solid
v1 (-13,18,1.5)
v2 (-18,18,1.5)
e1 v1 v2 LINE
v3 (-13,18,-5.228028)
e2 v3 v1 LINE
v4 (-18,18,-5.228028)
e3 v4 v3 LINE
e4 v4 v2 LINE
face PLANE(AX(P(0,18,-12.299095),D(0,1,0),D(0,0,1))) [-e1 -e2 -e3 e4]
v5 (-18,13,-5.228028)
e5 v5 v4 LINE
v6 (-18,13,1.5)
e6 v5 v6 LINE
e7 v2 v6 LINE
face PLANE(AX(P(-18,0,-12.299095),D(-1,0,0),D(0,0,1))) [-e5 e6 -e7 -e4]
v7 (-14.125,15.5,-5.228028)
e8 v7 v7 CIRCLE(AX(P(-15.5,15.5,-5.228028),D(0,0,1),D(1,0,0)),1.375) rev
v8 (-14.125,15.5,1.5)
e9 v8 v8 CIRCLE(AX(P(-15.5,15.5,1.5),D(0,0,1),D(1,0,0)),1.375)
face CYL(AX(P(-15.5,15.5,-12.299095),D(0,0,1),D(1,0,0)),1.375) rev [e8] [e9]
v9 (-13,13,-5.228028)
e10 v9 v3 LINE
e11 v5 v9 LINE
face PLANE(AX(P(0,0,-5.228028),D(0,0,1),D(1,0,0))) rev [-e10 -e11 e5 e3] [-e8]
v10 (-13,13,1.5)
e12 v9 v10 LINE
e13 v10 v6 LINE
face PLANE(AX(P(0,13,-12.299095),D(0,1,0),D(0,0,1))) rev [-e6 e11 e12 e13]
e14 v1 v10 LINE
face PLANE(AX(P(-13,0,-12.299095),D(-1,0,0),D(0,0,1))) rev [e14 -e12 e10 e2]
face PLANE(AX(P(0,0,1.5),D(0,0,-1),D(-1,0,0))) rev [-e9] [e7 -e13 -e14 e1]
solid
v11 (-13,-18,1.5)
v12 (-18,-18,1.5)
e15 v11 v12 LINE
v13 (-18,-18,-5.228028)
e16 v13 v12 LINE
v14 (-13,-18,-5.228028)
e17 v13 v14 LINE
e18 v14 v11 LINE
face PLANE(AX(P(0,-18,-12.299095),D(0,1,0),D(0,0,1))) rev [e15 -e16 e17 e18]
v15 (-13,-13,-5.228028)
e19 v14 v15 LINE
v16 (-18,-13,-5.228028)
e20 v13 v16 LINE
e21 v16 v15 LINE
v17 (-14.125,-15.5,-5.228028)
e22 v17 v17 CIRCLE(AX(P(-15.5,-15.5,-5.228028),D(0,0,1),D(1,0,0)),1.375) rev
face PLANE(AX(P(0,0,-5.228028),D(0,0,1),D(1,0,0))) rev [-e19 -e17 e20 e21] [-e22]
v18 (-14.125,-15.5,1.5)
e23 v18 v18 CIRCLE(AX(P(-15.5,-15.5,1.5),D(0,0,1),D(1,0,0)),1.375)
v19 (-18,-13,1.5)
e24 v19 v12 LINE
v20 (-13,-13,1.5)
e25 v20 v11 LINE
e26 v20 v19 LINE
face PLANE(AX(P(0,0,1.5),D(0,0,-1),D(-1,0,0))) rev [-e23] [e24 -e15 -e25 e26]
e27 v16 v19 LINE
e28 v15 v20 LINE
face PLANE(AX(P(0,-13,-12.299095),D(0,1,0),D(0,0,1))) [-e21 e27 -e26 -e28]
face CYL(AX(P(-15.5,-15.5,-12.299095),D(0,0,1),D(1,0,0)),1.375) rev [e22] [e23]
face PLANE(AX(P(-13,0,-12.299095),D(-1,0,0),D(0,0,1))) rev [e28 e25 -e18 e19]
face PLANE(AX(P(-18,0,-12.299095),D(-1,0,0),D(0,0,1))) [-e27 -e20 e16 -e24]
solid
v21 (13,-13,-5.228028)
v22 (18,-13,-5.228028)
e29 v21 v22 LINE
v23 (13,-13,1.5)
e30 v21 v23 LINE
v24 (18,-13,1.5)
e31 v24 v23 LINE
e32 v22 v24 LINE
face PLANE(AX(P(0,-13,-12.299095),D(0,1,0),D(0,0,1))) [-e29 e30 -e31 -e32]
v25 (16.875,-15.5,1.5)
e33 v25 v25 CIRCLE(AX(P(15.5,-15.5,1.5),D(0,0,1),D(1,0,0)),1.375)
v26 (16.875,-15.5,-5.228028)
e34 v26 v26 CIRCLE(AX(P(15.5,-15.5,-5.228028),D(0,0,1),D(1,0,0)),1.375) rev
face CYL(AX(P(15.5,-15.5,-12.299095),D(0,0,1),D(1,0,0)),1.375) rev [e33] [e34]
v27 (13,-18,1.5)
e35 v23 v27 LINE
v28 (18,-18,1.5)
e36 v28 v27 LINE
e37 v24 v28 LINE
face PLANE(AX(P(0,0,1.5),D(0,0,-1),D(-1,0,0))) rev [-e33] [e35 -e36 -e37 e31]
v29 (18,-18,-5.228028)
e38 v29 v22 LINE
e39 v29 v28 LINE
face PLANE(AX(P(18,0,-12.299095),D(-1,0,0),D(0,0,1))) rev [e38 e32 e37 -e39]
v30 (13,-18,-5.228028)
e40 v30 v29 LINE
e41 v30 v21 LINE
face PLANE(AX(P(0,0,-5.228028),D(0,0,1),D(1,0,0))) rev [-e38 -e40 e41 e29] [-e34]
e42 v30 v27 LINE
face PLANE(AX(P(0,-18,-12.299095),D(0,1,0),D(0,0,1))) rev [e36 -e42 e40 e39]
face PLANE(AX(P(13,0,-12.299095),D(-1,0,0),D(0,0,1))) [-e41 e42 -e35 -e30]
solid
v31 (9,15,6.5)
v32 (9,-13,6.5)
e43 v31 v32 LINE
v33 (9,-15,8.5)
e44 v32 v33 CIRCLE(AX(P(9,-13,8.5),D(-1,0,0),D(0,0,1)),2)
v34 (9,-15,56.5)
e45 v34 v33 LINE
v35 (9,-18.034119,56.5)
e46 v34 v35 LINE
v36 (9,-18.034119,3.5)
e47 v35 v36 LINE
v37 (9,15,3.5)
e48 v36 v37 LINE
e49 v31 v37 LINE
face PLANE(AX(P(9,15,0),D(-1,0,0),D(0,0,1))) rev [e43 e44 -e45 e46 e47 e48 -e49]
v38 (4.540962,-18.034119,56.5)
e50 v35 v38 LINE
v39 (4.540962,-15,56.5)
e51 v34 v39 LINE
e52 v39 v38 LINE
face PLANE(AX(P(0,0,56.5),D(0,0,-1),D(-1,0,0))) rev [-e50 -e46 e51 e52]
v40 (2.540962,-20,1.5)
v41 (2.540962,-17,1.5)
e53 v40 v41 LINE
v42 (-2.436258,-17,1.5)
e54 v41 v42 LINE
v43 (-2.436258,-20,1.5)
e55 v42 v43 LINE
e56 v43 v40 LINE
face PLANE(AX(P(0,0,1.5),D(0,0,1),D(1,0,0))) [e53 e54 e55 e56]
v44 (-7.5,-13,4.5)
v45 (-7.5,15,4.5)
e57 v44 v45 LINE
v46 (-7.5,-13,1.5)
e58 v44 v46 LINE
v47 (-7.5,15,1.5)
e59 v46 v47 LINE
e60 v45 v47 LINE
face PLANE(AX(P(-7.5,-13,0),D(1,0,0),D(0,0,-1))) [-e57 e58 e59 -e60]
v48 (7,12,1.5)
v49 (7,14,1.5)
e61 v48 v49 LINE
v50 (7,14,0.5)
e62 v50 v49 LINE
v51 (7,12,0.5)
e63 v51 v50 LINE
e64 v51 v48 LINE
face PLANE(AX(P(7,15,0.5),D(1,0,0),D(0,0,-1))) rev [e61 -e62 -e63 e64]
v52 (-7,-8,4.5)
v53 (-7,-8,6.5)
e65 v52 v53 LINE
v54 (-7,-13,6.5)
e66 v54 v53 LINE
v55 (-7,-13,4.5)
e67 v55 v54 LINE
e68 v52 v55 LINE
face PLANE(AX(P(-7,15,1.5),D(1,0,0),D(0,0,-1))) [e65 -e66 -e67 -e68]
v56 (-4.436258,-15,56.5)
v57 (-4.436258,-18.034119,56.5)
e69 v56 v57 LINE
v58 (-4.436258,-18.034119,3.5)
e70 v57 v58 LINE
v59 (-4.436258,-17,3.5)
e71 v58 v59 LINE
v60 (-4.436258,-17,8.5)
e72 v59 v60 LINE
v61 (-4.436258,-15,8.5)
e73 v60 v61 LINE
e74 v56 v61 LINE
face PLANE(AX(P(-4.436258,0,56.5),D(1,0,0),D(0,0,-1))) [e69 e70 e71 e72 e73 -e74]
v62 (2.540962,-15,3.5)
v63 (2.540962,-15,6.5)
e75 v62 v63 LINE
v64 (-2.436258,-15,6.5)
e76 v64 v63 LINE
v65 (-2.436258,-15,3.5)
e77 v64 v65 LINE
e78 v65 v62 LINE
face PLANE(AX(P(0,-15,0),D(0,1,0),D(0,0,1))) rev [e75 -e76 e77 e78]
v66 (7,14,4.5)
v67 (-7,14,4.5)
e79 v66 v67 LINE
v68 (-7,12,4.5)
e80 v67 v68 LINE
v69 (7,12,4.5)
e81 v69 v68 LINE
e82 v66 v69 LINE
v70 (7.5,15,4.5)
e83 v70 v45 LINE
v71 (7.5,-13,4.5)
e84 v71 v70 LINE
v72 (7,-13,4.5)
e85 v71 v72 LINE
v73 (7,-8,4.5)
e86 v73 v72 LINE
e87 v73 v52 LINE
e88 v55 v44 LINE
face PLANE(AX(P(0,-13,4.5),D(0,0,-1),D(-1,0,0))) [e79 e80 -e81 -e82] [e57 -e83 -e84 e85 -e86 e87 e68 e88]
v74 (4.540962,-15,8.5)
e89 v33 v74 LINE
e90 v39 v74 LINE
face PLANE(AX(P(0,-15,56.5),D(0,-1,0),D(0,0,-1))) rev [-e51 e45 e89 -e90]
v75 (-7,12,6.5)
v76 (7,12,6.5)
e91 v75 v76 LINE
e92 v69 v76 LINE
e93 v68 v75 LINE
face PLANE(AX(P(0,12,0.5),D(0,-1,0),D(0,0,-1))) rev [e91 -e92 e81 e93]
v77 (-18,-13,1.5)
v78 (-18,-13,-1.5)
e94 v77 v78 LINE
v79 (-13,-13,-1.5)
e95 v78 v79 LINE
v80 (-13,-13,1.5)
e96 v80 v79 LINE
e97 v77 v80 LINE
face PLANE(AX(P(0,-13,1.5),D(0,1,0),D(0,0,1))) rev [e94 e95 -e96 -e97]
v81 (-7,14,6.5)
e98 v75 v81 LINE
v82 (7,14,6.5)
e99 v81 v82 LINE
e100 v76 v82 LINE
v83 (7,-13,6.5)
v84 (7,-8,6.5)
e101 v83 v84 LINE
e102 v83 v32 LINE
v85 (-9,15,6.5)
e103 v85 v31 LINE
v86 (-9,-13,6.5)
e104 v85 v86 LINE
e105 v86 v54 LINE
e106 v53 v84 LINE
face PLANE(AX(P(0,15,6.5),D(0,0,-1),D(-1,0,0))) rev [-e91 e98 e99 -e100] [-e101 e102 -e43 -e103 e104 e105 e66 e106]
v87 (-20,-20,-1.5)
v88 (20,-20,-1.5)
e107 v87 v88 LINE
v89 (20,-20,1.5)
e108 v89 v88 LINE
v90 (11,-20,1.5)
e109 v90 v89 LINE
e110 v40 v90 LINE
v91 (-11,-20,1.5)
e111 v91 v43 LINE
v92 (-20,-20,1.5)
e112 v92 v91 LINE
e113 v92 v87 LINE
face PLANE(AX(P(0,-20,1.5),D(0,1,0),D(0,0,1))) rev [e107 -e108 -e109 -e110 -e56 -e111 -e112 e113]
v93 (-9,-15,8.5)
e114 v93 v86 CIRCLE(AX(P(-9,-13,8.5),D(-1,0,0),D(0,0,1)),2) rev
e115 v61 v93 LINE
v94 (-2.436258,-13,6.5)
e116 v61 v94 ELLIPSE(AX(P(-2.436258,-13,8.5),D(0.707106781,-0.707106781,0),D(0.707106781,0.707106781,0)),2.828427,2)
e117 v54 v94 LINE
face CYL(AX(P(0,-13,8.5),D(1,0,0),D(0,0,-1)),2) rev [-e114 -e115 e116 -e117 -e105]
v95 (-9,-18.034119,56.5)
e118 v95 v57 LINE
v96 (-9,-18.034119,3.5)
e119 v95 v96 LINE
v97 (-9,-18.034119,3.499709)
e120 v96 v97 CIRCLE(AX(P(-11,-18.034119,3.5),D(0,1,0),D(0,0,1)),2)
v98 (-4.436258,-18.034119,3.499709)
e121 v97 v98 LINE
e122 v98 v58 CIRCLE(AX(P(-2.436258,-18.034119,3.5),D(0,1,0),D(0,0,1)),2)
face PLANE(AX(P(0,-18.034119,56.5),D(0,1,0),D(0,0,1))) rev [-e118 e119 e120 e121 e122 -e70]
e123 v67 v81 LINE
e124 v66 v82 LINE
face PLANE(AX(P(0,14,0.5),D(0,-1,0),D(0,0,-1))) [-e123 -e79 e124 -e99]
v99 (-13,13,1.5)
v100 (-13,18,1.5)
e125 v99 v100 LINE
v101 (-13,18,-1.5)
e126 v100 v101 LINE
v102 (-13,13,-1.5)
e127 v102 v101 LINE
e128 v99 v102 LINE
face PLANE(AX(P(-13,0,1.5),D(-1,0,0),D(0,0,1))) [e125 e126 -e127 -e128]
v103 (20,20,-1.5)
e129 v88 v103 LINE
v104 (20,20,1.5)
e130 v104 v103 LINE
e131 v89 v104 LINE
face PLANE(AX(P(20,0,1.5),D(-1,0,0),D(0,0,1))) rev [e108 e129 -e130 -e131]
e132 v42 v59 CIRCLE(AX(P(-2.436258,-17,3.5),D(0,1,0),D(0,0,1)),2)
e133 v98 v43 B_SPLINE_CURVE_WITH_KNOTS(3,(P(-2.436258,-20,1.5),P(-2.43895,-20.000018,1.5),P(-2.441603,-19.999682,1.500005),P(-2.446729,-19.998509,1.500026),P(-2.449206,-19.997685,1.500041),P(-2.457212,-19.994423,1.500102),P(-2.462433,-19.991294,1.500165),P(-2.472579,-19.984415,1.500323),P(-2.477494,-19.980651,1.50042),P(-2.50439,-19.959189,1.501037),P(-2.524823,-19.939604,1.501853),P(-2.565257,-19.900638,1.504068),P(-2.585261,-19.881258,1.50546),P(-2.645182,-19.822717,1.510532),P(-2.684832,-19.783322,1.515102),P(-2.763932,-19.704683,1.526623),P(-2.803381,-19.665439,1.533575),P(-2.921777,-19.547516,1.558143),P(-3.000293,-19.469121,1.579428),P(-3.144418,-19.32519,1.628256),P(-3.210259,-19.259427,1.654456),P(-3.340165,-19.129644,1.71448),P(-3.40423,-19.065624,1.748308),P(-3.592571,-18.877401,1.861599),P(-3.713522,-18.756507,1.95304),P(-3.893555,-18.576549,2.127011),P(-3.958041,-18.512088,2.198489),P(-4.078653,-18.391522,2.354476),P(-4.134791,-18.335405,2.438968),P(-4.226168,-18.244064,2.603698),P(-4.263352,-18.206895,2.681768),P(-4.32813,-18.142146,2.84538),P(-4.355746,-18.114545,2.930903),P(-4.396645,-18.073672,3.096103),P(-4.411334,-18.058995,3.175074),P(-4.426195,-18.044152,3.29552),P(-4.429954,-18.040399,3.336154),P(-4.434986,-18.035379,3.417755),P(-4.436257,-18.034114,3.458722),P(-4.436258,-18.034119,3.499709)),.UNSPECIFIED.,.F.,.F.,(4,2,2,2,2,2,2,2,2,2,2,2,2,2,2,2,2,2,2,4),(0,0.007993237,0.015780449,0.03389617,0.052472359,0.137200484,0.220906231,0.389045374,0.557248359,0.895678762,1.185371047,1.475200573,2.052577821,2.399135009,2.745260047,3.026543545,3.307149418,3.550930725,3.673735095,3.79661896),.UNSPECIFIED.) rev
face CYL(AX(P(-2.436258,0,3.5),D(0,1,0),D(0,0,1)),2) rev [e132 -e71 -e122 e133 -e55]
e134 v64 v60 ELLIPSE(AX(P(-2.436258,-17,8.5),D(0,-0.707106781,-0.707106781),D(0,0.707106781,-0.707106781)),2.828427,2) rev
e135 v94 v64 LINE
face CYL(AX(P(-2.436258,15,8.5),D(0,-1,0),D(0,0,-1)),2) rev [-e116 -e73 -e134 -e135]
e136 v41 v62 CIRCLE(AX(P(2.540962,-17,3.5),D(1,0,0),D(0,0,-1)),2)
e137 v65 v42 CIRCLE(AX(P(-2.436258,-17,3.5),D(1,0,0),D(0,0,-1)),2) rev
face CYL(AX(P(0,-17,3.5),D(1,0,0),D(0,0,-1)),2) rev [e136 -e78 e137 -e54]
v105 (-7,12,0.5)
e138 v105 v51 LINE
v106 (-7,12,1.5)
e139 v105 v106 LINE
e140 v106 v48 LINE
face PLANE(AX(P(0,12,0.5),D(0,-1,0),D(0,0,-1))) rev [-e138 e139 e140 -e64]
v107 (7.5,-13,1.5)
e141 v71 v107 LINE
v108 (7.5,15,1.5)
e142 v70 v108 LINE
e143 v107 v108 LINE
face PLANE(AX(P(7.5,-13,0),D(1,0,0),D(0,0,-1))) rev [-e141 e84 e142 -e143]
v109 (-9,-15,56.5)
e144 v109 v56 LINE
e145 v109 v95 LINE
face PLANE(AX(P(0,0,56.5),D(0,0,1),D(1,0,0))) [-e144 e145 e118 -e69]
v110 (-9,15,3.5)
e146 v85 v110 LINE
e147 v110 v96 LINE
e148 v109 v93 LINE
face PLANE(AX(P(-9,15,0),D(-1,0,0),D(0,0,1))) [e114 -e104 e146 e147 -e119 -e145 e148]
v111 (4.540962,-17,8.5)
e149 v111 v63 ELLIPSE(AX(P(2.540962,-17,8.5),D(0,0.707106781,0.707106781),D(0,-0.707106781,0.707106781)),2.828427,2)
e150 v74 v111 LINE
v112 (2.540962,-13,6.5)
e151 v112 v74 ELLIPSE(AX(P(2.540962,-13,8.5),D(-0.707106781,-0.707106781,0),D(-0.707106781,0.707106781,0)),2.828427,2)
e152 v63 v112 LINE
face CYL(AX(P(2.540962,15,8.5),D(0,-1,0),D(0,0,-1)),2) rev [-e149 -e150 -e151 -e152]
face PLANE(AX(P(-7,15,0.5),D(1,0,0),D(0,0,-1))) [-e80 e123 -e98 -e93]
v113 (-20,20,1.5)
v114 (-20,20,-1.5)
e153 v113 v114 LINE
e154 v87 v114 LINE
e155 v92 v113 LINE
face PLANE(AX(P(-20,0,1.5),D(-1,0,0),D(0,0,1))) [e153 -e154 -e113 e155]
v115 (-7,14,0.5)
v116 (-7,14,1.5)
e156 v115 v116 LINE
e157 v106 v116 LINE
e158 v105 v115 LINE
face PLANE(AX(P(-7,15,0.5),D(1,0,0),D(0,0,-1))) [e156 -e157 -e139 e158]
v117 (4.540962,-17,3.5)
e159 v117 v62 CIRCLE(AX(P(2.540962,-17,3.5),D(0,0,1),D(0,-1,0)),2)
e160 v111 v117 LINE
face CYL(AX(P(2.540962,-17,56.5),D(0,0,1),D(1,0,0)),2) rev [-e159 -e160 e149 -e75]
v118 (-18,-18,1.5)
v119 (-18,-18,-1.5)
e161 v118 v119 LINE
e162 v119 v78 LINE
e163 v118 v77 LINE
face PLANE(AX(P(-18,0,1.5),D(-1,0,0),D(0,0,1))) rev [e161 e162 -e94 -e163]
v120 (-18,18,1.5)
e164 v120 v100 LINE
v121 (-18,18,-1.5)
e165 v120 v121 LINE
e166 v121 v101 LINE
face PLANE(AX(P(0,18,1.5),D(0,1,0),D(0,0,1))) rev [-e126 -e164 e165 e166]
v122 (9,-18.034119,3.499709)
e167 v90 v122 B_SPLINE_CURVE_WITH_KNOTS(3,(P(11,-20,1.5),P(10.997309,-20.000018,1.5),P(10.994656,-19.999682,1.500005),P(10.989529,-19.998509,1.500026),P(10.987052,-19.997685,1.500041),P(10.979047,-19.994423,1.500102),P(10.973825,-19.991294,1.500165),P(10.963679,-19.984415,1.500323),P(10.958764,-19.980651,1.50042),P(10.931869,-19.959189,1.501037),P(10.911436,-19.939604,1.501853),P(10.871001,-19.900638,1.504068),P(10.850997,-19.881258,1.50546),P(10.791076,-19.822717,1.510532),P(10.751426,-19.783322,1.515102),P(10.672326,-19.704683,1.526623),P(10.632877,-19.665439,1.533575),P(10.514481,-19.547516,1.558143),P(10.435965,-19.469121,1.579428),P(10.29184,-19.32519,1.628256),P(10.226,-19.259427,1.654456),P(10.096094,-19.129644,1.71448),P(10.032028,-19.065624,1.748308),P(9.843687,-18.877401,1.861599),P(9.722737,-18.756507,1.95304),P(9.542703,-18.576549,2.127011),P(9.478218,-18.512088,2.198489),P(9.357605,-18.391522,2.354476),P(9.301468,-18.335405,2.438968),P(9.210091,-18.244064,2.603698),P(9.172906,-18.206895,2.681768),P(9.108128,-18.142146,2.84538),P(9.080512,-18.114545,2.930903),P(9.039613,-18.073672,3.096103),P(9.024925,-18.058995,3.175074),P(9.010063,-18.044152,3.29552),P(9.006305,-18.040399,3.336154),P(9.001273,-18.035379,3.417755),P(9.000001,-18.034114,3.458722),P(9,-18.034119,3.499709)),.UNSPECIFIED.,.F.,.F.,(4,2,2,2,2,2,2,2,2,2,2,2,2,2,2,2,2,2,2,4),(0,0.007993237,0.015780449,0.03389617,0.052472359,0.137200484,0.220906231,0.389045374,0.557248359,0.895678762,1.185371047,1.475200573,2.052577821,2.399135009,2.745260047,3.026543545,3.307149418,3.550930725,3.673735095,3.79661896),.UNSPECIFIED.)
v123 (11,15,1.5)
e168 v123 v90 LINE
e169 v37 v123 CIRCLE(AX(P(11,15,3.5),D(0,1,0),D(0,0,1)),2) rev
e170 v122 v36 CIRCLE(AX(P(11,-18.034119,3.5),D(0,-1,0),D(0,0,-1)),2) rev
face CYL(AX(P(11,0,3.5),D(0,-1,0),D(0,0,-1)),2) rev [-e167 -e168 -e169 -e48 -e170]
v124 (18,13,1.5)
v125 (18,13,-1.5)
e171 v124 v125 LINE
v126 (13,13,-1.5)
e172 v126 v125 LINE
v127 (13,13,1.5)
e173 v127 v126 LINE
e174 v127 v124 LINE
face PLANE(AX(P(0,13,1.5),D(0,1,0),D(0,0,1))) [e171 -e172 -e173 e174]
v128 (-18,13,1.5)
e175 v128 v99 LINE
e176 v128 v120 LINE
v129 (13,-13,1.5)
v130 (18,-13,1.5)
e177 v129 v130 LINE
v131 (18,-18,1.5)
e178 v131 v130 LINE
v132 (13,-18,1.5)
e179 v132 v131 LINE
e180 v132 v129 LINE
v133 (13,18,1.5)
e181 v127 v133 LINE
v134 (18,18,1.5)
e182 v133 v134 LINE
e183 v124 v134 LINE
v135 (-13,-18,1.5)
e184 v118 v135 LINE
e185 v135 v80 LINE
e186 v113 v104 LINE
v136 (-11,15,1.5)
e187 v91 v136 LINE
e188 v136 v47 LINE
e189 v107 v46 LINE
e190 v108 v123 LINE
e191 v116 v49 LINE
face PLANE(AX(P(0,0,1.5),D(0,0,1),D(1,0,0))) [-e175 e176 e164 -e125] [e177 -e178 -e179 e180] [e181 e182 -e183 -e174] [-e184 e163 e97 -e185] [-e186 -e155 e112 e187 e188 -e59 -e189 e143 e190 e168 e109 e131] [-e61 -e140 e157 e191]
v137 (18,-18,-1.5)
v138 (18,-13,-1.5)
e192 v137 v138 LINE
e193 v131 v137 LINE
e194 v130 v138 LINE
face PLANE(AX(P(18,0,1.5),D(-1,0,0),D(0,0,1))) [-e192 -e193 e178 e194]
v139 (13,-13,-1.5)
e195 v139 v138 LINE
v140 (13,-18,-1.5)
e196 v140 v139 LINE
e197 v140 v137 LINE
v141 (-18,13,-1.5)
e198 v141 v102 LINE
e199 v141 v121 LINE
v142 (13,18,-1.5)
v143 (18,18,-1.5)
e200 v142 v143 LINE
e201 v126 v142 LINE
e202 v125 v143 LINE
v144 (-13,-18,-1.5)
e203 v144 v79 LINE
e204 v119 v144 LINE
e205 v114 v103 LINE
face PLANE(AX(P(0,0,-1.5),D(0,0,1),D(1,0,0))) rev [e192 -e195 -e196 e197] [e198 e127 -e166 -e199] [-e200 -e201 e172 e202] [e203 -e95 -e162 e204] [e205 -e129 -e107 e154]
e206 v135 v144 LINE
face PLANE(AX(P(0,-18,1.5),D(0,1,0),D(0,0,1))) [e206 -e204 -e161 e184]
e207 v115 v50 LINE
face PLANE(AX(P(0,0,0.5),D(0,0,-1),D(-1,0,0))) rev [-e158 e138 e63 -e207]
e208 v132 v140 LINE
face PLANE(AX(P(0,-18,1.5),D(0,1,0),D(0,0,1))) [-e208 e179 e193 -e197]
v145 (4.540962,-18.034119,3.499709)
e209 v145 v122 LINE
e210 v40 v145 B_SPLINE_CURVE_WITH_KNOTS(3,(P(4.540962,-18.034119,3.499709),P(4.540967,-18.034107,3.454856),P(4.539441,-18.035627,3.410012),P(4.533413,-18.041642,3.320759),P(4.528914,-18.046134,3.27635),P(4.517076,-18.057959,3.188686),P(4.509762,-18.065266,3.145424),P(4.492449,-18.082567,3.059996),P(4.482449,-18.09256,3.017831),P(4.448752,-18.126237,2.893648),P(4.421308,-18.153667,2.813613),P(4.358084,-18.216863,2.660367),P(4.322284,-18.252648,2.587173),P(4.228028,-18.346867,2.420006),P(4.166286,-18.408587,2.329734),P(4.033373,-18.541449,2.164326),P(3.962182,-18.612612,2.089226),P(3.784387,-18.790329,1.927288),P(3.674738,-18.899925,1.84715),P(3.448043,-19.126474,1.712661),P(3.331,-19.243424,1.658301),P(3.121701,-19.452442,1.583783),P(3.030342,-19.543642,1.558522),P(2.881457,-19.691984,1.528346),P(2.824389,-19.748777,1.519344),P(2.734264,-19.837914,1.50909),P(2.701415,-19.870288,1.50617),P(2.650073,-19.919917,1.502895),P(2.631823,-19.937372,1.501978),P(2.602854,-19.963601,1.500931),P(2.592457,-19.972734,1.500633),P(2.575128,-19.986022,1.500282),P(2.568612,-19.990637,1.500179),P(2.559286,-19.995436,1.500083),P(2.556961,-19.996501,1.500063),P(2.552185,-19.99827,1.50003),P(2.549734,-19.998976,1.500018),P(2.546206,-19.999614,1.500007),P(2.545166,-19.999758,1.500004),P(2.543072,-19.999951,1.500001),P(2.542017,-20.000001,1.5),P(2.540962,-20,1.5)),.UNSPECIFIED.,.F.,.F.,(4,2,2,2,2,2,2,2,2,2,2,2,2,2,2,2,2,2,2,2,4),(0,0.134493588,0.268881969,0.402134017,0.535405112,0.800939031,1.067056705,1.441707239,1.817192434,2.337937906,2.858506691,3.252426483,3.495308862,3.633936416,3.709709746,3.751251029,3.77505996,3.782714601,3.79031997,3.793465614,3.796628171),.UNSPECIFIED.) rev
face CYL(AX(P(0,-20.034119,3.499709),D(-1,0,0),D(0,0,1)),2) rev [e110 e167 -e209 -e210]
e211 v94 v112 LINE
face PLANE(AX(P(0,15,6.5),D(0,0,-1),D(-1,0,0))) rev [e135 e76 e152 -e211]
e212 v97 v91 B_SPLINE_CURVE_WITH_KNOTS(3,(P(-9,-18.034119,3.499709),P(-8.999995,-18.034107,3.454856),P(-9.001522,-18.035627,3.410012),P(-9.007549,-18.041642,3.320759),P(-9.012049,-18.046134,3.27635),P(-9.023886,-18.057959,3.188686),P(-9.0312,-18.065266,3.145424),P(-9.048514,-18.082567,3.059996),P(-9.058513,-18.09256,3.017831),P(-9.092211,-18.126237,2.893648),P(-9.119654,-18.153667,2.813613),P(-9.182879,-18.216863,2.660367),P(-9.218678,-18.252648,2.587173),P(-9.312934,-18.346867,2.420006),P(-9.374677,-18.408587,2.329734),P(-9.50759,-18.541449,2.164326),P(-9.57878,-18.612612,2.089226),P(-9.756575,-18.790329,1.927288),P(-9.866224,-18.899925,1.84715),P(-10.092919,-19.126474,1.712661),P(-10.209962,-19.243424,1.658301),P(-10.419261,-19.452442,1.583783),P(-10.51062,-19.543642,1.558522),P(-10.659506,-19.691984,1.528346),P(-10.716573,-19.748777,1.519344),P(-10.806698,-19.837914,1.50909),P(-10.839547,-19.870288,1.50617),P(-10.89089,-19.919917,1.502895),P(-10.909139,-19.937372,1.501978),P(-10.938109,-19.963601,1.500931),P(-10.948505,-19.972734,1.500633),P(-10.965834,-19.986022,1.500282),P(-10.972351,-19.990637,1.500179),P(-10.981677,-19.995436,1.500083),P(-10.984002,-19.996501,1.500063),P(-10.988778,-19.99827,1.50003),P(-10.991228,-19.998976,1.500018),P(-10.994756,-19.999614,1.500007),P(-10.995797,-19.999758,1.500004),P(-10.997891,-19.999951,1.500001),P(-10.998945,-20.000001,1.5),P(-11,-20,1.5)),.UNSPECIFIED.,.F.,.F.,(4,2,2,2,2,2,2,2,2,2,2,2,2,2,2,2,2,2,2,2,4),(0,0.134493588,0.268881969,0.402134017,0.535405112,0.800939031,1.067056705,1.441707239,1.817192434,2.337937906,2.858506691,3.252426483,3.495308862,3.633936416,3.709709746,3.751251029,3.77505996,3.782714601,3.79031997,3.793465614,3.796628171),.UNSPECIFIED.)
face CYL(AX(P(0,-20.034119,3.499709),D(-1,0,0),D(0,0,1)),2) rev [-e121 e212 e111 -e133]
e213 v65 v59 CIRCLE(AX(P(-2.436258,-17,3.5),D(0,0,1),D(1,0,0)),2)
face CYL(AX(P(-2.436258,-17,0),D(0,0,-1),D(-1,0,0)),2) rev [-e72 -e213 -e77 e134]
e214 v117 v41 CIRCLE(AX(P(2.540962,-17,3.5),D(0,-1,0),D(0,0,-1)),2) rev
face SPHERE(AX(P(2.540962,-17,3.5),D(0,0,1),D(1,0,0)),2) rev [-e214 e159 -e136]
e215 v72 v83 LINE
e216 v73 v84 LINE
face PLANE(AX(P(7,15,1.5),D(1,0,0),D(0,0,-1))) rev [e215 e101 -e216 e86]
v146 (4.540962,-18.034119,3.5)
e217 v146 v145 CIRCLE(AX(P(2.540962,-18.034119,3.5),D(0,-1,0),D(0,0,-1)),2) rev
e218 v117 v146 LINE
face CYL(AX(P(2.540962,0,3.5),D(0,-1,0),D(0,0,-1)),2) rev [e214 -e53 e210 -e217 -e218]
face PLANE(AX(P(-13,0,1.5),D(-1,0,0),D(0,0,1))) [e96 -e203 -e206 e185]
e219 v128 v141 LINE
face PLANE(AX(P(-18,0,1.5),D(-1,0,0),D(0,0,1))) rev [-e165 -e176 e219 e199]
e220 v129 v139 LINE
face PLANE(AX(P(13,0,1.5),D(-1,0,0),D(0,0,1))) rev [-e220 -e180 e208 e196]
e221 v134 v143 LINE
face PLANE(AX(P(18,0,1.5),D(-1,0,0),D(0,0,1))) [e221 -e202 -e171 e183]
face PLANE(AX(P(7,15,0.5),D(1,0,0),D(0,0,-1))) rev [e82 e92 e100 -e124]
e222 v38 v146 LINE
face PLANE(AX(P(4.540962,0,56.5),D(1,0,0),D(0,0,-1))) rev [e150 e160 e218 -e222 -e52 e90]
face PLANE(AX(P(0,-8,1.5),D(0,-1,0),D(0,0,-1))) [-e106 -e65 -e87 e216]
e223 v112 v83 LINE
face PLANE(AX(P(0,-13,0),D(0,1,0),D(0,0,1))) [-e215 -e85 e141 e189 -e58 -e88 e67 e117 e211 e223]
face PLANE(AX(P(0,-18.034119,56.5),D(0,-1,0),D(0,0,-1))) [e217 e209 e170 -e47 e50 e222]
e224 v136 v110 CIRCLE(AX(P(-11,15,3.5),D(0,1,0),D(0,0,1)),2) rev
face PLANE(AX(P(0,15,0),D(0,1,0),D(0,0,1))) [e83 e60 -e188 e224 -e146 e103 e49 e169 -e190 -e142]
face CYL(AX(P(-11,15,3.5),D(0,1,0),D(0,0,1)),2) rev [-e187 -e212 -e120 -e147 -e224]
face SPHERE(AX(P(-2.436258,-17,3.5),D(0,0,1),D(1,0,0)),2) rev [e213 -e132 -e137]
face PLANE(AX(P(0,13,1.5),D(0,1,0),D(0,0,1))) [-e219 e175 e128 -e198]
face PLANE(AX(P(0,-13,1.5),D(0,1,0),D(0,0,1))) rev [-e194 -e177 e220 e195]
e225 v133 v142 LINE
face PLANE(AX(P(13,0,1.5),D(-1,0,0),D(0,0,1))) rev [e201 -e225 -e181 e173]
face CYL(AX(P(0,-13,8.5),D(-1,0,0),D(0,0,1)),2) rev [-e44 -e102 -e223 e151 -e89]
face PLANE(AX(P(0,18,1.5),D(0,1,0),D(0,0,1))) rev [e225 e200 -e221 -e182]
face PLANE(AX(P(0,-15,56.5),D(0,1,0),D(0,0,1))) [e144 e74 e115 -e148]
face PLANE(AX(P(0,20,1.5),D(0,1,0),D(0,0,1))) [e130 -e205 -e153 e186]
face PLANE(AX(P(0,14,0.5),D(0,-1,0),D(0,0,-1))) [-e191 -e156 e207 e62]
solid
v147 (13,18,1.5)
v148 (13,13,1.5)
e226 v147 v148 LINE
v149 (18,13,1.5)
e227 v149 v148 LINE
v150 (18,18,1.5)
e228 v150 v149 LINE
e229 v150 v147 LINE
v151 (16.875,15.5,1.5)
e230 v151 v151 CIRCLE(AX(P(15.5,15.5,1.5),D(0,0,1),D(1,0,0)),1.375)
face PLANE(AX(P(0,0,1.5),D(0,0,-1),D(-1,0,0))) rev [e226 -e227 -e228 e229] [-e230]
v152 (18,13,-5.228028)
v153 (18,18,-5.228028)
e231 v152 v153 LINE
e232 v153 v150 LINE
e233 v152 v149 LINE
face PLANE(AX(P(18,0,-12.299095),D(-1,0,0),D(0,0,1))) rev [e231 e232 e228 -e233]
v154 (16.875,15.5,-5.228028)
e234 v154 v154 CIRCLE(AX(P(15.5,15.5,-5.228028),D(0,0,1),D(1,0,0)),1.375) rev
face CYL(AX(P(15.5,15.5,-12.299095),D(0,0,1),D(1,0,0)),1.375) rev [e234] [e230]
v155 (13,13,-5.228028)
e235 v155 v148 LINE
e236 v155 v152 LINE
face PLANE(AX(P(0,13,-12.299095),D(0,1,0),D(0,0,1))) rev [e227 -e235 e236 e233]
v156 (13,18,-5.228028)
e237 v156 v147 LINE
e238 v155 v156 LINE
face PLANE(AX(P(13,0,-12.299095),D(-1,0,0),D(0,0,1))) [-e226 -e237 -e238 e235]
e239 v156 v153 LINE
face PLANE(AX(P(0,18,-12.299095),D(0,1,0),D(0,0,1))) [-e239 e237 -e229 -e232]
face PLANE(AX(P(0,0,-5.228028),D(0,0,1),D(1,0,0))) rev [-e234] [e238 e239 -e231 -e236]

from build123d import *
from OCP.BRepAlgoAPI import BRepAlgoAPI_Cut
from OCP.TopTools import TopTools_ListOfShape

# Parameters (mm, degrees)
SKETCH1_W             = 40
SKETCH1_H             = 40
SKETCH1_W_2           = 5
SKETCH1_H_2           = 5
BOSS_EXTRUDE1_DEPTH   = 1.5
BOSS_EXTRUDE2_START   = 1.5
SKETCH1_3_W           = 5
SKETCH1_3_H           = 5
SKETCH1_3_R           = 1.375
BOSS_EXTRUDE2_DEPTH   = 6.728027623
BOSS_EXTRUDE2_2_DEPTH = 6.728027623
BOSS_EXTRUDE2_3_DEPTH = 6.728027623
BOSS_EXTRUDE2_4_DEPTH = 6.728027623
SKETCH2_W             = 18
SKETCH2_H             = 5
BOSS_EXTRUDE3_DEPTH   = 15
CUT_EXTRUDE1_START    = -13
SKETCH2_3_W           = 15
SKETCH2_3_H           = 3
CUT_EXTRUDE1_DEPTH    = 28
BOSS_EXTRUDE4_START   = 1.5
SKETCH5_W             = 4.563741623
SKETCH5_H             = 3.034118579
SKETCH5_W_2           = 4.459037602
BOSS_EXTRUDE4_DEPTH   = 55
CUT_EXTRUDE2_START    = 6.5
SKETCH5_3_W           = 14
SKETCH5_3_H           = 2
CUT_EXTRUDE2_DEPTH    = 6
CUT_EXTRUDE3_START    = 6.5
SKETCH5_4_W           = 14
SKETCH5_4_H           = 5
CUT_EXTRUDE3_DEPTH    = 5
FILLET2_START         = -9
FILLET2_DEPTH         = 18
FILLET2_START_2       = -20.000000802
FILLET2_2_DEPTH       = 7.000000802
FILLET2_START_3       = -15
FILLET2_3_DEPTH       = 30
FILLET2_START_4       = -12
FILLET2_4_DEPTH       = 24
FILLET2_5_DEPTH       = 4.563741623
FILLET2_START_5       = 4.540962398
FILLET2_6_DEPTH       = 4.459037602
FILLET3_R             = 2


with BuildPart() as part:
    # Sketch1 → Boss-Extrude1 (new, symmetric)
    with BuildSketch(Plane.XY):
        Rectangle(SKETCH1_W, SKETCH1_H)
        with Locations((-15.5, -15.5)):
            Rectangle(SKETCH1_W_2, SKETCH1_H_2, mode=Mode.SUBTRACT)
        with Locations((15.5, -15.5)):
            Rectangle(SKETCH1_W_2, SKETCH1_H_2, mode=Mode.SUBTRACT)
        with Locations((15.5, 15.5)):
            Rectangle(SKETCH1_W_2, SKETCH1_H_2, mode=Mode.SUBTRACT)
        with Locations((-15.5, 15.5)):
            Rectangle(SKETCH1_W_2, SKETCH1_H_2, mode=Mode.SUBTRACT)
    extrude(amount=BOSS_EXTRUDE1_DEPTH, both=True)

    # Sketch2 → Boss-Extrude3 (add, symmetric)
    with BuildSketch(Plane(origin=(0, 0, 0), x_dir=(1, 0, 0), z_dir=(0, 1, 0))):
        with Locations((0, -4)):
            Rectangle(SKETCH2_W, SKETCH2_H)
    extrude(amount=BOSS_EXTRUDE3_DEPTH, both=True)

    # Sketch2<3> → Cut-Extrude1 (cut)
    with BuildSketch(Plane(origin=(0, 0, 0), x_dir=(1, 0, 0), z_dir=(0, 1, 0)).offset(CUT_EXTRUDE1_START)):
        with Locations((0, -3)):
            Rectangle(SKETCH2_3_W, SKETCH2_3_H)
    extrude(amount=CUT_EXTRUDE1_DEPTH, mode=Mode.SUBTRACT)

    # Sketch5 → Boss-Extrude4 (add)
    with BuildSketch(Plane.XY.offset(BOSS_EXTRUDE4_START)):
        with Locations((-6.718129189, -16.51705929)):
            Rectangle(SKETCH5_W, SKETCH5_H)
        with Locations((6.770481199, -16.51705929)):
            Rectangle(SKETCH5_W_2, SKETCH5_H)
    extrude(amount=BOSS_EXTRUDE4_DEPTH)

    # Sketch5<3> → Cut-Extrude2 (cut)
    with BuildSketch(Plane.XY.offset(CUT_EXTRUDE2_START)):
        with Locations((0, 13)):
            Rectangle(SKETCH5_3_W, SKETCH5_3_H)
    extrude(amount=-CUT_EXTRUDE2_DEPTH, mode=Mode.SUBTRACT)

    # Sketch5<4> → Cut-Extrude3 (cut)
    with BuildSketch(Plane.XY.offset(CUT_EXTRUDE3_START)):
        with Locations((0, -10.5)):
            Rectangle(SKETCH5_4_W, SKETCH5_4_H)
    extrude(amount=-CUT_EXTRUDE3_DEPTH, mode=Mode.SUBTRACT)


with BuildPart() as body_2:
    # Sketch1<3> → Boss-Extrude2 (new body)
    with BuildSketch(Plane.XY.offset(BOSS_EXTRUDE2_START)):
        with Locations((-15.5, -15.5)):
            Rectangle(SKETCH1_3_W, SKETCH1_3_H)
        with Locations((-15.5, -15.5)):
            Circle(SKETCH1_3_R, mode=Mode.SUBTRACT)
    extrude(amount=-BOSS_EXTRUDE2_DEPTH)


with BuildPart() as body_3:
    # Sketch1<3> → Boss-Extrude2 2 (new body)
    with BuildSketch(Plane.XY.offset(BOSS_EXTRUDE2_START)):
        with Locations((15.5, -15.5)):
            Rectangle(SKETCH1_3_W, SKETCH1_3_H)
        with Locations((15.5, -15.5)):
            Circle(SKETCH1_3_R, mode=Mode.SUBTRACT)
    extrude(amount=-BOSS_EXTRUDE2_2_DEPTH)


with BuildPart() as body_4:
    # Sketch1<3> → Boss-Extrude2 3 (new body)
    with BuildSketch(Plane.XY.offset(BOSS_EXTRUDE2_START)):
        with Locations((15.5, 15.5)):
            Rectangle(SKETCH1_3_W, SKETCH1_3_H)
        with Locations((15.5, 15.5)):
            Circle(SKETCH1_3_R, mode=Mode.SUBTRACT)
    extrude(amount=-BOSS_EXTRUDE2_3_DEPTH)


with BuildPart() as body_5:
    # Sketch1<3> → Boss-Extrude2 4 (new body)
    with BuildSketch(Plane.XY.offset(BOSS_EXTRUDE2_START)):
        with Locations((-15.5, 15.5)):
            Rectangle(SKETCH1_3_W, SKETCH1_3_H)
        with Locations((-15.5, 15.5)):
            Circle(SKETCH1_3_R, mode=Mode.SUBTRACT)
    extrude(amount=-BOSS_EXTRUDE2_4_DEPTH)


with BuildPart() as fillet2_tool:
    # Fillet2: read off the stored shape, not the designer's step
    # Fillet2 outline → Fillet2 (new body)
    with BuildSketch(Plane.YZ.offset(FILLET2_START)):
        with BuildLine():
            ThreePointArc((-15, 3.5), (-15.585786438, 2.085786438), (-17, 1.5))
            Line((-17, 1.5), (-15, 1.5))
            Line((-15, 1.5), (-15, 3.5))
        make_face()
    extrude(amount=FILLET2_DEPTH)


with BuildPart() as part_1:
    add(part.part)


with BuildPart() as part_2:
    # Fillet2: joined with fillet2_tool
    add(part_1.part.fuse(fillet2_tool.part, tol=0.00001))


with BuildPart() as fillet2_2_tool:
    # Fillet2 2 outline → Fillet2 2 (new body)
    with BuildSketch(Plane(origin=(0, 0, 0), x_dir=(1, 0, 0), z_dir=(0, 1, 0)).offset(FILLET2_START_2)):
        with BuildLine():
            ThreePointArc((-11, -1.5), (-9.585786438, -2.085786438), (-9, -3.5))
            Line((-9, -3.5), (-9, -6.5))
            Line((-9, -6.5), (-4.436258377, -6.5))
            Line((-4.436258377, -6.5), (-4.436258377, -3.5))
            ThreePointArc((-4.436258377, -3.5), (-3.85047194, -2.085786437), (-2.436258377, -1.5))
            Line((-2.436258377, -1.5), (-11, -1.5))
        make_face()
        with BuildLine():
            Line((4.540962398, -3.5), (4.540962398, -6.5))
            Line((4.540962398, -6.5), (9, -6.5))
            Line((9, -6.5), (9, -3.5))
            ThreePointArc((9, -3.5), (9.585786438, -2.085786438), (11, -1.5))
            Line((11, -1.5), (2.540962398, -1.5))
            ThreePointArc((2.540962398, -1.5), (3.95517596, -2.085786438), (4.540962398, -3.5))
        make_face()
    extrude(amount=FILLET2_2_DEPTH)


with BuildPart() as part_3:
    add(part_2.part)


with BuildPart() as part_4:
    # Fillet2 2: joined with fillet2_2_tool
    add(part_3.part.fuse(fillet2_2_tool.part, tol=0.00001))


with BuildPart() as fillet2_3_tool:
    # Fillet2 3 outline → Fillet2 3 (new body)
    with BuildSketch(Plane(origin=(0, 0, 0), x_dir=(1, 0, 0), z_dir=(0, 1, 0)).offset(FILLET2_START_3)):
        with BuildLine():
            ThreePointArc((-11, -1.5), (-9.585786438, -2.085786438), (-9, -3.5))
            Line((-9, -3.5), (-9, -1.5))
            Line((-9, -1.5), (-11, -1.5))
        make_face()
        with BuildLine():
            Line((9, -1.5), (9, -3.5))
            ThreePointArc((9, -3.5), (9.585786438, -2.085786438), (11, -1.5))
            Line((11, -1.5), (9, -1.5))
        make_face()
    extrude(amount=FILLET2_3_DEPTH)


with BuildPart() as part_5:
    add(part_4.part)


with BuildPart() as part_6:
    # Fillet2 3: joined with fillet2_3_tool
    add(part_5.part.fuse(fillet2_3_tool.part, tol=0.00001))


with BuildPart() as fillet2_4_tool:
    # Fillet2 4 outline → Fillet2 4 (new body)
    with BuildSketch(Plane.YZ.offset(FILLET2_START_4)):
        with BuildLine():
            ThreePointArc((-20, 1.5), (-18.607893288, 2.097610025), (-18.034118579, 3.499708959))
            Line((-18.034118579, 3.499708959), (-18.034118579, 6.5))
            Line((-18.034118579, 6.5), (-20.000000802, 6.5))
            Line((-20.000000802, 6.5), (-20, 1.5))
        make_face()
    extrude(amount=FILLET2_4_DEPTH)


with BuildPart() as part_7:
    add(part_6.part)

    # Fillet2 4: cut by fillet2_4_tool, with a tolerance
    fillet2_4_stock = TopTools_ListOfShape()
    fillet2_4_stock.Append(part_7.part.wrapped)
    fillet2_4_tools = TopTools_ListOfShape()
    fillet2_4_tools.Append(fillet2_4_tool.part.wrapped)
    fillet2_4_cut = BRepAlgoAPI_Cut()
    fillet2_4_cut.SetArguments(fillet2_4_stock)
    fillet2_4_cut.SetTools(fillet2_4_tools)
    fillet2_4_cut.SetFuzzyValue(0.00001)
    fillet2_4_cut.Build()
    add(Compound.cast(fillet2_4_cut.Shape()).solids(), mode=Mode.REPLACE)


with BuildPart() as fillet2_5_tool:
    # Fillet2 5 outline → Fillet2 5 (new body)
    with BuildSketch(Plane.YZ.offset(FILLET2_START)):
        with BuildLine():
            Line((-15, 6.5), (-13, 6.5))
            ThreePointArc((-13, 6.5), (-14.414213562, 7.085786438), (-15, 8.5))
            Line((-15, 8.5), (-15, 6.5))
        make_face()
    extrude(amount=FILLET2_5_DEPTH)


with BuildPart() as part_8:
    add(part_7.part)


with BuildPart() as part_9:
    # Fillet2 5: joined with fillet2_5_tool
    add(part_8.part.fuse(fillet2_5_tool.part, tol=0.00001))


with BuildPart() as fillet2_6_tool:
    # Fillet2 6 outline → Fillet2 6 (new body)
    with BuildSketch(Plane.YZ.offset(FILLET2_START_5)):
        with BuildLine():
            Line((-15, 6.5), (-13, 6.5))
            ThreePointArc((-13, 6.5), (-14.414213562, 7.085786438), (-15, 8.5))
            Line((-15, 8.5), (-15, 6.5))
        make_face()
    extrude(amount=FILLET2_6_DEPTH)


with BuildPart() as part_10:
    add(part_9.part)


with BuildPart() as part_11:
    # Fillet2 6: joined with fillet2_6_tool
    add(part_10.part.fuse(fillet2_6_tool.part, tol=0.00001))

    # Fillet3
    # the kernel refuses this fillet: 2 mm, written as the material it adds along each edge
    with BuildSketch(Plane(origin=(-2.436258377, -17, 3.5), x_dir=(0, 1, 0), z_dir=(-1, 0, 0))) as fillet3_piece_1_section:
        Polygon((0, 0), (FILLET3_R * 1.02, 0), (FILLET3_R * 1.02, FILLET3_R * 1.02), (0, FILLET3_R * 1.02), align=None)
    fillet3_piece_1 = extrude(amount=FILLET3_R * 1.02, mode=Mode.PRIVATE)
    fillet3_piece_1 = fillet3_piece_1 - Plane(origin=(-2.436258377, -17, 3.5), x_dir=(0, -0.7071067811865475, 0.7071067811865475), z_dir=(-1, 0, 0)) * Sphere(FILLET3_R, mode=Mode.PRIVATE)
    add(fillet3_piece_1)
    with BuildSketch(Plane(origin=(2.540962398, -17, 3.5), x_dir=(0, 1, 0), z_dir=(1, 0, 0))) as fillet3_piece_2_section:
        Polygon((0, 0), (FILLET3_R * 1.02, 0), (FILLET3_R * 1.02, -FILLET3_R * 1.02), (0, -FILLET3_R * 1.02), align=None)
    fillet3_piece_2 = extrude(amount=FILLET3_R * 1.02, mode=Mode.PRIVATE)
    fillet3_piece_2 = fillet3_piece_2 - Plane(origin=(2.540962398, -17, 3.5), x_dir=(0, -0.7071067811865475, 0.7071067811865475), z_dir=(1, 0, 0)) * Sphere(FILLET3_R, mode=Mode.PRIVATE)
    add(fillet3_piece_2)
    with BuildSketch(Plane(origin=(-4.436258377, -15, 3.5), x_dir=(6.810330077655635e-11, -1.0, 0), z_dir=(0, 0, 1))) as fillet3_piece_3:
        with BuildLine():
            CenterArc((FILLET3_R, FILLET3_R), FILLET3_R, 179.999999996, 90)
            Line((FILLET3_R * 6.81033007812e-11, FILLET3_R), (0, 0))
            Line((0, 0), (FILLET3_R, 0))
        make_face()
    extrude(amount=3)
    with BuildSketch(Plane(origin=(4.540962398, -15, 3.5), x_dir=(5.859757123971576e-12, -1.0, 0), z_dir=(0, 0, 1))) as fillet3_piece_4:
        with BuildLine():
            CenterArc((FILLET3_R, -FILLET3_R), FILLET3_R, 90, 90)
            Line((0, -FILLET3_R), (0, 0))
            Line((0, 0), (FILLET3_R, 0))
        make_face()
    extrude(amount=3)
    with BuildSketch(Plane(origin=(4.540962398, -15, 6.5), x_dir=(-1, 0, 0), z_dir=(0, 1, 0))) as fillet3_piece_5_section:
        with BuildLine():
            CenterArc((FILLET3_R, FILLET3_R), FILLET3_R, 180, 90)
            Line((0, FILLET3_R), (0, 0))
            Line((0, 0), (FILLET3_R, 0))
        make_face()
    fillet3_piece_5 = extrude(amount=2, mode=Mode.PRIVATE)
    fillet3_piece_5 = fillet3_piece_5 - Plane(origin=(4.540962398, -12.999999999, 8.500000001), x_dir=(0, -6.36912744361302e-10, -1.0), z_dir=(-1, 0, 0)) * Cylinder(2.000000001, 12, mode=Mode.PRIVATE)
    add(fillet3_piece_5)
    with BuildSketch(Plane(origin=(-4.436258377, -15, 6.5), x_dir=(1, 0, 0), z_dir=(0, 1, 0))) as fillet3_piece_6_section:
        with BuildLine():
            CenterArc((FILLET3_R, -FILLET3_R), FILLET3_R, 90, 90)
            Line((0, -FILLET3_R), (0, 0))
            Line((0, 0), (FILLET3_R, 0))
        make_face()
    fillet3_piece_6 = extrude(amount=2, mode=Mode.PRIVATE)
    fillet3_piece_6 = fillet3_piece_6 - Plane(origin=(-4.436258377, -12.999999999, 8.500000001), x_dir=(0, -6.36912744361302e-10, -1.0), z_dir=(-1, 0, 0)) * Cylinder(2.000000001, 12, mode=Mode.PRIVATE)
    add(fillet3_piece_6)
    with BuildSketch(Plane(origin=(-4.436258377, -20, 6.5), x_dir=(1, 0, 0), z_dir=(0, 1, 0))) as fillet3_piece_7a_section:
        with BuildLine():
            CenterArc((FILLET3_R, -FILLET3_R), FILLET3_R, 90, 90)
            Line((0, -FILLET3_R), (0, 0))
            Line((0, 0), (FILLET3_R, 0))
        make_face()
    fillet3_piece_7a = extrude(amount=7, mode=Mode.PRIVATE)
    fillet3_piece_7a = split(fillet3_piece_7a, bisect_by=Plane(origin=(-4.436258377, -18.034118579, 6.5), z_dir=(0, 1, 0)), keep=Keep.TOP, mode=Mode.PRIVATE)
    fillet3_piece_7a = split(fillet3_piece_7a, bisect_by=Plane(origin=(-4.436258377, -15, 6.5), z_dir=(0, -1, 0)), keep=Keep.TOP, mode=Mode.PRIVATE)
    with BuildSketch(Plane(origin=(-4.436258377, -15, 3.5), x_dir=(6.810330077655635e-11, -1.0, 0), z_dir=(0, 0, 1))) as fillet3_piece_7b_section:
        with BuildLine():
            CenterArc((FILLET3_R, FILLET3_R), FILLET3_R, 179.999999996, 90)
            Line((FILLET3_R * 6.81033007812e-11, FILLET3_R), (0, 0))
            Line((0, 0), (FILLET3_R, 0))
        make_face()
    fillet3_piece_7b = extrude(amount=8, mode=Mode.PRIVATE)
    fillet3_piece_7b = split(fillet3_piece_7b, bisect_by=Plane(origin=(-4.436258377, -15, 6.5), z_dir=(0, 0, 1)), keep=Keep.TOP, mode=Mode.PRIVATE)
    fillet3_piece_7 = fillet3_piece_7a & fillet3_piece_7b
    add(fillet3_piece_7)
    with BuildSketch(Plane(origin=(4.540962398, -20, 6.5), x_dir=(-1, 0, 0), z_dir=(0, 1, 0))) as fillet3_piece_8a_section:
        with BuildLine():
            CenterArc((FILLET3_R, FILLET3_R), FILLET3_R, 180, 90)
            Line((0, FILLET3_R), (0, 0))
            Line((0, 0), (FILLET3_R, 0))
        make_face()
    fillet3_piece_8a = extrude(amount=7, mode=Mode.PRIVATE)
    fillet3_piece_8a = split(fillet3_piece_8a, bisect_by=Plane(origin=(4.540962398, -18.034118579, 6.5), z_dir=(0, 1, 0)), keep=Keep.TOP, mode=Mode.PRIVATE)
    fillet3_piece_8a = split(fillet3_piece_8a, bisect_by=Plane(origin=(4.540962398, -15, 6.5), z_dir=(0, -1, 0)), keep=Keep.TOP, mode=Mode.PRIVATE)
    with BuildSketch(Plane(origin=(4.540962398, -15, 3.5), x_dir=(5.859757123971576e-12, -1.0, 0), z_dir=(0, 0, 1))) as fillet3_piece_8b_section:
        with BuildLine():
            CenterArc((FILLET3_R, -FILLET3_R), FILLET3_R, 90, 90)
            Line((0, -FILLET3_R), (0, 0))
            Line((0, 0), (FILLET3_R, 0))
        make_face()
    fillet3_piece_8b = extrude(amount=8, mode=Mode.PRIVATE)
    fillet3_piece_8b = split(fillet3_piece_8b, bisect_by=Plane(origin=(4.540962398, -15, 6.5), z_dir=(0, 0, 1)), keep=Keep.TOP, mode=Mode.PRIVATE)
    fillet3_piece_8 = fillet3_piece_8a & fillet3_piece_8b
    add(fillet3_piece_8)


solid = Compound([body_2.part, body_3.part, body_4.part, body_5.part, part_11.part])
